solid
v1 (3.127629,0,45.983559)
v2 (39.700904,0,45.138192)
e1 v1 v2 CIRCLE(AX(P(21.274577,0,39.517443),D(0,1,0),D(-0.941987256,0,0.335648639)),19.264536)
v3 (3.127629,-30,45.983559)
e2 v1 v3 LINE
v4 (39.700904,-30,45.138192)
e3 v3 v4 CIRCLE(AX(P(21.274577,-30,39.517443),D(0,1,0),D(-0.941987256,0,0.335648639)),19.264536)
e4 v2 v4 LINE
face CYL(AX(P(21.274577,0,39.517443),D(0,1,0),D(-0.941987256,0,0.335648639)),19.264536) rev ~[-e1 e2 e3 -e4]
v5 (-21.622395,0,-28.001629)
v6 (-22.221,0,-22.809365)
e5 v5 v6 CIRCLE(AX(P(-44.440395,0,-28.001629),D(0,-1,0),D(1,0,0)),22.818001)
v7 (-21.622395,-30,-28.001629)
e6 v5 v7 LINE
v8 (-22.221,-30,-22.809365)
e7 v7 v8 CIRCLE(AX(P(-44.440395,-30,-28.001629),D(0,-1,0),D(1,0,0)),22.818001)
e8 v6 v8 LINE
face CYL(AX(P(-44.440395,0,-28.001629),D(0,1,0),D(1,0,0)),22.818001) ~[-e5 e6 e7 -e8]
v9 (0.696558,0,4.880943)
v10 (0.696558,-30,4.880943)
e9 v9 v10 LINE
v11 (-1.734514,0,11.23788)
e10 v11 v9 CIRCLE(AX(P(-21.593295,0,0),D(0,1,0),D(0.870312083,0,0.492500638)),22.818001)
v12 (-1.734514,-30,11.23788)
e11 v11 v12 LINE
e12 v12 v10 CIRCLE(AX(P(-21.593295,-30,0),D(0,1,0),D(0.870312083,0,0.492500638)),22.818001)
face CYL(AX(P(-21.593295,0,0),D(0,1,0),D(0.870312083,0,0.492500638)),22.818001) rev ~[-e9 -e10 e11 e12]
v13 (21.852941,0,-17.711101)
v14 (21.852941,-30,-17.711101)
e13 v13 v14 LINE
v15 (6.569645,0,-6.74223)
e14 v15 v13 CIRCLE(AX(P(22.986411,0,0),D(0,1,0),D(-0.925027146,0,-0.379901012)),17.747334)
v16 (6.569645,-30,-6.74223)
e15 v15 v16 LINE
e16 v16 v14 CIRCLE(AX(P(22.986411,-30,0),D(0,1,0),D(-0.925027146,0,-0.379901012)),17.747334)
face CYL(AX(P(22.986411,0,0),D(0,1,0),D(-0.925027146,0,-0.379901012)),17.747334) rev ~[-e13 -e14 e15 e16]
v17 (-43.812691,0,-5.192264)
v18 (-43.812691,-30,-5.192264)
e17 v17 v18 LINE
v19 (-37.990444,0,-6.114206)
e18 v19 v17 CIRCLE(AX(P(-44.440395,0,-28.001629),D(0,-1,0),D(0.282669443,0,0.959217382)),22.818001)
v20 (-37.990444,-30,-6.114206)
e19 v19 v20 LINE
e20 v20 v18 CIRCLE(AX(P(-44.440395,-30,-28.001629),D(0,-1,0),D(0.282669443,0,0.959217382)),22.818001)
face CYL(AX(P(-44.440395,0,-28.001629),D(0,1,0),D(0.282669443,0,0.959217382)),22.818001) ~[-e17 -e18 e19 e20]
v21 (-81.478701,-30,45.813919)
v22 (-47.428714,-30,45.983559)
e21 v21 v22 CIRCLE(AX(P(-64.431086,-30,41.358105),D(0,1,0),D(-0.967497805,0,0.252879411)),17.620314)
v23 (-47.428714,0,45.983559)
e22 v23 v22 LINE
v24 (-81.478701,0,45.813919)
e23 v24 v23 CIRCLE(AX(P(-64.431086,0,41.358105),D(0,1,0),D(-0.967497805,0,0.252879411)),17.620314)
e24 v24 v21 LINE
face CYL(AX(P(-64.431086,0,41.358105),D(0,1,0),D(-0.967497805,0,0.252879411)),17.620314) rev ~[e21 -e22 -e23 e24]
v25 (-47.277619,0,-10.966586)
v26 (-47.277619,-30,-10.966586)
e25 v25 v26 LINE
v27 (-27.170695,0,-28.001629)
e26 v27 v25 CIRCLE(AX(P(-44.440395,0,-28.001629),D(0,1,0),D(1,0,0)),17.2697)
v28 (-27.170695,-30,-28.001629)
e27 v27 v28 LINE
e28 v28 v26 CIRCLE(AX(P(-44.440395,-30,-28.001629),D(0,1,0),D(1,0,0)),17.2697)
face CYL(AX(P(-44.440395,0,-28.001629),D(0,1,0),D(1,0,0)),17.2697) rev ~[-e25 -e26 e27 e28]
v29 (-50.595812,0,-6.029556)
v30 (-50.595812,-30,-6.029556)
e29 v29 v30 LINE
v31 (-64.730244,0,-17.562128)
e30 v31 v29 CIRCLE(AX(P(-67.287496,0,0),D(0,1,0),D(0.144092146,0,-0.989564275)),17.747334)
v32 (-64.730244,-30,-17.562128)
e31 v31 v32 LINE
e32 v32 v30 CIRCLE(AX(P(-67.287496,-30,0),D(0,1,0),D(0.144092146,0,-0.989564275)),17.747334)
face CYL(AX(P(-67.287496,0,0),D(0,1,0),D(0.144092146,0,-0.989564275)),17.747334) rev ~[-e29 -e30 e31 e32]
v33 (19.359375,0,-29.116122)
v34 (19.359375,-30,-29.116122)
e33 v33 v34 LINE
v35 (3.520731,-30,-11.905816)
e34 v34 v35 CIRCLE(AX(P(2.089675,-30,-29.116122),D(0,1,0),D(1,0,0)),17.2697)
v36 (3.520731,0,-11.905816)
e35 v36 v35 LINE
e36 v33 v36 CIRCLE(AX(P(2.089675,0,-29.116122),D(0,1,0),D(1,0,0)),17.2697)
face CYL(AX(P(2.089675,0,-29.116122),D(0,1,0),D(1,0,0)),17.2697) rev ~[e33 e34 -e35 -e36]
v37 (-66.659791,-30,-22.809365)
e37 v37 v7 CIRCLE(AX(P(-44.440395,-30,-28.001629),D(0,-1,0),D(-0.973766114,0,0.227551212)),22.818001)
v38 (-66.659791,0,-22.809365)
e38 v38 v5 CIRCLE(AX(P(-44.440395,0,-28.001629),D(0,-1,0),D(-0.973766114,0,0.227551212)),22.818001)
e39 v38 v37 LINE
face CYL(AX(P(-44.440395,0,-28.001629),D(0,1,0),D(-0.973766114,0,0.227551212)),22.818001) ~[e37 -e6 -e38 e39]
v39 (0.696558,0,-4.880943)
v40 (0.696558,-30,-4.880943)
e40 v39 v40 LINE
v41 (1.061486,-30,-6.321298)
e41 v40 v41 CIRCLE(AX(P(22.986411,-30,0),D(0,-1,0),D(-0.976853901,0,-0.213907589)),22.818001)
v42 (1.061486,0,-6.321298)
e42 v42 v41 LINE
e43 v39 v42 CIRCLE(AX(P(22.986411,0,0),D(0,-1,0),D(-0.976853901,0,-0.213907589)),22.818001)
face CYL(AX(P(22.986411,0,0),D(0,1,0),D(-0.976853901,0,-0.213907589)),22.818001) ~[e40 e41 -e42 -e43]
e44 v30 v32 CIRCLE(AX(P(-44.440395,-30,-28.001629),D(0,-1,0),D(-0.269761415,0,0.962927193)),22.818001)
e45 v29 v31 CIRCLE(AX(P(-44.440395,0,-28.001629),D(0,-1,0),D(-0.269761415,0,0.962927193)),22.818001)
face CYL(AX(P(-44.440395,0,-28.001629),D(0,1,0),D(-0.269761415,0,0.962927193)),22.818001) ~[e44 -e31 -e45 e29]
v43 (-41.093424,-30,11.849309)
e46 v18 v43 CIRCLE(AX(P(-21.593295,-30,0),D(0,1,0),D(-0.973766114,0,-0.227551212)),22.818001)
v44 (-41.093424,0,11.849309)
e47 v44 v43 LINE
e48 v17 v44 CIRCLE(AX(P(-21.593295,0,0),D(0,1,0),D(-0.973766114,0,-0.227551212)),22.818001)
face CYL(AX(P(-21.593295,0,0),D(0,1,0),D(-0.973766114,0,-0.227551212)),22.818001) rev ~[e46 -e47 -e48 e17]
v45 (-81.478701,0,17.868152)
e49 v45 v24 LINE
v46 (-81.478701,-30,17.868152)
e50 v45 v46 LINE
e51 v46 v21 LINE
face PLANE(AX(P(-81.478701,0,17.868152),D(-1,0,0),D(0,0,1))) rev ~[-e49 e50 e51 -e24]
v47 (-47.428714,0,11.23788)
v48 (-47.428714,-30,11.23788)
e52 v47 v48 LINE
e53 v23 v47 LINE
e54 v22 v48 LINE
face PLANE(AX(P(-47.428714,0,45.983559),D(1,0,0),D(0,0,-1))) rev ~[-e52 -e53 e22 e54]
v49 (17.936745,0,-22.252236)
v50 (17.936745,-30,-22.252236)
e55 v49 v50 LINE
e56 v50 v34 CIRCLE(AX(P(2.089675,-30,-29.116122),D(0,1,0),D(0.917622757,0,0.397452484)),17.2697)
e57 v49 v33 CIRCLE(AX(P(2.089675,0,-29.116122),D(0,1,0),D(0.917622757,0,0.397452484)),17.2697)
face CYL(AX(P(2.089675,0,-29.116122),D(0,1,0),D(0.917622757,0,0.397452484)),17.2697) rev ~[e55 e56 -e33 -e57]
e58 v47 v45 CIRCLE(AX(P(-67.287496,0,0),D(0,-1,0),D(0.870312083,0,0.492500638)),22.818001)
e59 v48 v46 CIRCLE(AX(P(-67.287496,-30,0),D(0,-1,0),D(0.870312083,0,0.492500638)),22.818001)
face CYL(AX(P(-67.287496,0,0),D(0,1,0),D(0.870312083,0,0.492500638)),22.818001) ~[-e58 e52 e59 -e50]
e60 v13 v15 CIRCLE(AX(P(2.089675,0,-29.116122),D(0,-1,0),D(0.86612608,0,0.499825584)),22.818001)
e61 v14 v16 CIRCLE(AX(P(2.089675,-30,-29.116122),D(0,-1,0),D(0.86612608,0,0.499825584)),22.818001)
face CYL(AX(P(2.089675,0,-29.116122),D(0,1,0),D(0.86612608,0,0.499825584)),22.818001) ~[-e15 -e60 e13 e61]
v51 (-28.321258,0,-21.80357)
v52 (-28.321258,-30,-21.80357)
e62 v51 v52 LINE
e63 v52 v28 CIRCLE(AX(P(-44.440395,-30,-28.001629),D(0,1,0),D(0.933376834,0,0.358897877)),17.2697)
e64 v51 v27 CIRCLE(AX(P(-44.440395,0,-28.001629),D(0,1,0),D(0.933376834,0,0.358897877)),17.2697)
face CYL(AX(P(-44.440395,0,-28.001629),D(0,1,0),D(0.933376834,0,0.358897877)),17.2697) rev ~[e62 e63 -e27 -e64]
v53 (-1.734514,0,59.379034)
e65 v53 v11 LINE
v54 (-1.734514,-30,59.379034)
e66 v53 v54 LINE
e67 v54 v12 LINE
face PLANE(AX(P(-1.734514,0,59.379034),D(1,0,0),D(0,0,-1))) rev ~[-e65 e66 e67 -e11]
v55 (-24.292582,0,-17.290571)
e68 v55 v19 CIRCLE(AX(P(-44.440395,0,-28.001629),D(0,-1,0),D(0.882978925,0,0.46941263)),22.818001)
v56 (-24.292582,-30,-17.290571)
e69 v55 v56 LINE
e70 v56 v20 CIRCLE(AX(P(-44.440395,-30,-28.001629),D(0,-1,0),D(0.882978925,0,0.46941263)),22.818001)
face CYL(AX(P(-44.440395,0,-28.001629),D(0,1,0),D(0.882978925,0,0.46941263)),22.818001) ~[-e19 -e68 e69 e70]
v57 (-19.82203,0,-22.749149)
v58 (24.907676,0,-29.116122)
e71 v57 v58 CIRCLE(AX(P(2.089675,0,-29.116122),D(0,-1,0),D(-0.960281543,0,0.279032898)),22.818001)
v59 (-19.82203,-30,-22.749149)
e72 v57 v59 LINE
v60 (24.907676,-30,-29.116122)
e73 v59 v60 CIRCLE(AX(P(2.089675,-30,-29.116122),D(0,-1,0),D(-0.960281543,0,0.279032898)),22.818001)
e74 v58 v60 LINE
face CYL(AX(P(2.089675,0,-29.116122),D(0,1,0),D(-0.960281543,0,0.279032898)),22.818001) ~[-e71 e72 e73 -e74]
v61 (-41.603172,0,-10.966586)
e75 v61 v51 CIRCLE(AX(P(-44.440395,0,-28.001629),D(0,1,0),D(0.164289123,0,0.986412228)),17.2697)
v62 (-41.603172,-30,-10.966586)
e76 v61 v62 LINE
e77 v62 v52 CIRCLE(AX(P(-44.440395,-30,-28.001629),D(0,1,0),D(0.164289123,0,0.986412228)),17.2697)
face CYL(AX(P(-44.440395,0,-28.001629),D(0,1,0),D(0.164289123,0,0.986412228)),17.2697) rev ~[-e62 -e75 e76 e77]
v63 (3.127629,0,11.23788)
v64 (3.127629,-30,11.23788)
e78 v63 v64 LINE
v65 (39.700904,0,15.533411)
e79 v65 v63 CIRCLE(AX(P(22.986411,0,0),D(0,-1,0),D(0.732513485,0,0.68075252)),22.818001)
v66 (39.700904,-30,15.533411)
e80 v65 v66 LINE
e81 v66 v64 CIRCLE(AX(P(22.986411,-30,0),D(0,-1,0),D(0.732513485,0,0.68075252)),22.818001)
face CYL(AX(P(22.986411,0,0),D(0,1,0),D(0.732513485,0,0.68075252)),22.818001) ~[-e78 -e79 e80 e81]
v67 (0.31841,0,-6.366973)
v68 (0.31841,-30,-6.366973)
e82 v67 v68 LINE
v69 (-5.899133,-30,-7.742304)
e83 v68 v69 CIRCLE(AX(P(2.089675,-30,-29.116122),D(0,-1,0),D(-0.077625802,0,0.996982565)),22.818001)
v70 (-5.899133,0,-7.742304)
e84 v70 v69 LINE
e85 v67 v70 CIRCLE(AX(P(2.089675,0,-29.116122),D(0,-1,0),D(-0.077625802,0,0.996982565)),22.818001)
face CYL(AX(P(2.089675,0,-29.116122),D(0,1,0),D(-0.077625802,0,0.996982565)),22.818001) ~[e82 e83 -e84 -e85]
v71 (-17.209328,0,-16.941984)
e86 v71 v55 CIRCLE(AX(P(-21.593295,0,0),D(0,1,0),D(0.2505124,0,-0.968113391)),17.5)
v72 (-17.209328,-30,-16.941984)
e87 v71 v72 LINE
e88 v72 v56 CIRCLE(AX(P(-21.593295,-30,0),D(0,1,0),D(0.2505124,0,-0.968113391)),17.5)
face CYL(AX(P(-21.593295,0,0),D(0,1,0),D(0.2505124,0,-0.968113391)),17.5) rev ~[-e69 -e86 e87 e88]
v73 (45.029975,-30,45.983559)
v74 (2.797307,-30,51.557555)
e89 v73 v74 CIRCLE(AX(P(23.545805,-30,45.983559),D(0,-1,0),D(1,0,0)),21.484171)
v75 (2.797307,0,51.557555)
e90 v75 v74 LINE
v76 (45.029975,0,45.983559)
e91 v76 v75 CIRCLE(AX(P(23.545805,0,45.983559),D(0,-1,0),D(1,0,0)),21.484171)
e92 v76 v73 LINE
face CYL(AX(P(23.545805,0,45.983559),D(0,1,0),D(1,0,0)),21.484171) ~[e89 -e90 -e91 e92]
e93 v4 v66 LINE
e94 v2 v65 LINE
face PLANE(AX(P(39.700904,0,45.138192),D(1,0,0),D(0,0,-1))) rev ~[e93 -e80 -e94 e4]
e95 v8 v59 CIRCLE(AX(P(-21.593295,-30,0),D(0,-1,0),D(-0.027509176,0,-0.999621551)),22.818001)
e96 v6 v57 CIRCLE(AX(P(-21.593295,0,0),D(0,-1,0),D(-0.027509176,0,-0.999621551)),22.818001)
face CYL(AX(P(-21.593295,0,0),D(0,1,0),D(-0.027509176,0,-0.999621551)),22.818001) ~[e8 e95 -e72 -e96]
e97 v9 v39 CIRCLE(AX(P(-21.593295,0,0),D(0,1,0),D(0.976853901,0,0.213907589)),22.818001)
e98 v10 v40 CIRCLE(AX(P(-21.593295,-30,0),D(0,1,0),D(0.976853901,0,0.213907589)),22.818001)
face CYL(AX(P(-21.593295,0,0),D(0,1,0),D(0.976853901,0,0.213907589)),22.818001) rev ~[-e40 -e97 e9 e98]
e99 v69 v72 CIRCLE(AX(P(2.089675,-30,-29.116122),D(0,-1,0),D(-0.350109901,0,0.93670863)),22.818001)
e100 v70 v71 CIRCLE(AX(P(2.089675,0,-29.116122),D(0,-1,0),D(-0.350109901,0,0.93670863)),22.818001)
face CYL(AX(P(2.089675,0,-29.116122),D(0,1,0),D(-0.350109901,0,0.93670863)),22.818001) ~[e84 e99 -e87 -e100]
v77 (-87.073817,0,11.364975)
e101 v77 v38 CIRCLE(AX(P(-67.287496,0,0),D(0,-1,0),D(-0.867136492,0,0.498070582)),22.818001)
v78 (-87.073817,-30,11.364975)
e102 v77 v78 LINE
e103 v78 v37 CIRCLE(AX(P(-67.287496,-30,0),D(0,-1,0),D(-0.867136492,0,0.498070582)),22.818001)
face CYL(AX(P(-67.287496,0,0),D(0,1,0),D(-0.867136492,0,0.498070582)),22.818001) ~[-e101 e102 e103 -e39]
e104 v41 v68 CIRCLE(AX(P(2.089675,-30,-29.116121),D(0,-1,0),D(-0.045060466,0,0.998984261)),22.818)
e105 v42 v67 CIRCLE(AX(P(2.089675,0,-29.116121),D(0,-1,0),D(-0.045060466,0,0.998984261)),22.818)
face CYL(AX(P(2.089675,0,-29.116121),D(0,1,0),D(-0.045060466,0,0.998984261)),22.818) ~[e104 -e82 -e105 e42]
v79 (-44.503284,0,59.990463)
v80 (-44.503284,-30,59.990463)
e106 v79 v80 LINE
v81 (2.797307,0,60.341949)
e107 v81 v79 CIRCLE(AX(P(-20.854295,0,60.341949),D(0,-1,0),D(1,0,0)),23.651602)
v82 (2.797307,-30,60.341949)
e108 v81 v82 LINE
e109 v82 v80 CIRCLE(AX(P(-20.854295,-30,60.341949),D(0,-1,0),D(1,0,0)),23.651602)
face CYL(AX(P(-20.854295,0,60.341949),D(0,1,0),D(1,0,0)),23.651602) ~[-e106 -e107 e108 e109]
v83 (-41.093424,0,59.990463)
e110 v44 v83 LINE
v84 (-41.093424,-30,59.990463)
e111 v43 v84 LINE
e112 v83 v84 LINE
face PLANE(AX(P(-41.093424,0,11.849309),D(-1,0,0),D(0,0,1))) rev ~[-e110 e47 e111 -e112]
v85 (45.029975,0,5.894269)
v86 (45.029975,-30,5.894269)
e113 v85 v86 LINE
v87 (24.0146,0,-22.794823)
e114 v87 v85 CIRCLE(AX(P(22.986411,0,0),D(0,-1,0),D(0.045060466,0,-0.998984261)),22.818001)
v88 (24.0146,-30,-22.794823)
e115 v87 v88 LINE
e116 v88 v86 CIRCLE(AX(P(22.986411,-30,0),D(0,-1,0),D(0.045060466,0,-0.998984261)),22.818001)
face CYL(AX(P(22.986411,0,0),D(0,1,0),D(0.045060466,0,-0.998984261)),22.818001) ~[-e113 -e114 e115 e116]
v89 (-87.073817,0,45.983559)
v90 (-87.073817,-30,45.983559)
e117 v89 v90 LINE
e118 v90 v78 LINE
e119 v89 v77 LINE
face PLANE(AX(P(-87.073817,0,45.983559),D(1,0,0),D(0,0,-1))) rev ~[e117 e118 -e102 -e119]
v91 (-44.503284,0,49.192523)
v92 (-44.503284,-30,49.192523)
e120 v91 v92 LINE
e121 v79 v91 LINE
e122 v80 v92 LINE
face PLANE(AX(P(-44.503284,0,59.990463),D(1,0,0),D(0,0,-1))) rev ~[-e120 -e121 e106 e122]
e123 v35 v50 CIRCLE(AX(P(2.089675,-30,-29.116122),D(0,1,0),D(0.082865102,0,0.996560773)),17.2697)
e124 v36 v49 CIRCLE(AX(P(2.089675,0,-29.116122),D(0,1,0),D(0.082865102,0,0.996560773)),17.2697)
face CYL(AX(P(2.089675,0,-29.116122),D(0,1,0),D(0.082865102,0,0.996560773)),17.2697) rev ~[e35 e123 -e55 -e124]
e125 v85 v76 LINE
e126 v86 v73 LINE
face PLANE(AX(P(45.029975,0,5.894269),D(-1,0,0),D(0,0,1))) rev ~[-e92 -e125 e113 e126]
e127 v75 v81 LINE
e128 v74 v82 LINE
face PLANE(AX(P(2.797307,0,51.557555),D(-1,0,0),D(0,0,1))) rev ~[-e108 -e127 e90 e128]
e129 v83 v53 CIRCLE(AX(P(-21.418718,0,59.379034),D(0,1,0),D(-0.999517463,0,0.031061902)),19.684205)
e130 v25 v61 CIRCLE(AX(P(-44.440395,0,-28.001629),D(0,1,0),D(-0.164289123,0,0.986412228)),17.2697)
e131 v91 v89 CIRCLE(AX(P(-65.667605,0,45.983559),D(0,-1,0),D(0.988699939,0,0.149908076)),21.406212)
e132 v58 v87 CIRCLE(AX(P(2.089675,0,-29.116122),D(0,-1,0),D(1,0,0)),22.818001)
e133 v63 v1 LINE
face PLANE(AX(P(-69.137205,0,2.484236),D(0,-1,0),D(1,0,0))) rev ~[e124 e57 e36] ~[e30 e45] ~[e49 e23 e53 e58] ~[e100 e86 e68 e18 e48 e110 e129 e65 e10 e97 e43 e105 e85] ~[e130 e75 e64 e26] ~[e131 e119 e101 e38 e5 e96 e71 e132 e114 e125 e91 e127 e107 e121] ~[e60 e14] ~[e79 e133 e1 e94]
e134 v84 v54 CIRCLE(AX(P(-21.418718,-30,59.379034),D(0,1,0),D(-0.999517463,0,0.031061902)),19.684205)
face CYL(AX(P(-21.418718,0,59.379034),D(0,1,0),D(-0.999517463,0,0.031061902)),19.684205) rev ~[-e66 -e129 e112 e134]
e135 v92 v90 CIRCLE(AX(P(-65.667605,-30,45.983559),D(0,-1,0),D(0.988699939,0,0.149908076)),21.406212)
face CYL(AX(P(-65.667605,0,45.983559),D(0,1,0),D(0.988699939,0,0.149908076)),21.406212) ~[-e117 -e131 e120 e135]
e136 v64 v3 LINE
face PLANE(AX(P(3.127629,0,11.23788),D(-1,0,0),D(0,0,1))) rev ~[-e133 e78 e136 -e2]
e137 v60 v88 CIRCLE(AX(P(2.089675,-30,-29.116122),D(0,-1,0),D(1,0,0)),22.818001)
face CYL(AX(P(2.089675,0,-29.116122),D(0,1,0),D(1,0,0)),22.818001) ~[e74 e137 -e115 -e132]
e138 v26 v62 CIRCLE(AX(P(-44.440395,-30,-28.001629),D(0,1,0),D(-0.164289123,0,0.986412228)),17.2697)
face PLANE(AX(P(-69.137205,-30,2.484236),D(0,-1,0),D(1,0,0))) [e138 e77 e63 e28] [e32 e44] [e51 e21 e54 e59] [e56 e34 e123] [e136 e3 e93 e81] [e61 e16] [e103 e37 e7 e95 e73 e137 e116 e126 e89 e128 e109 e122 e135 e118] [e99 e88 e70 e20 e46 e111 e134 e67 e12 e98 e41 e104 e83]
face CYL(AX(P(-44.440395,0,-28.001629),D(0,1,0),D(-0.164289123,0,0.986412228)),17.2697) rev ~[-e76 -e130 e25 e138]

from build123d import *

# Parameters (mm, degrees)
F1_DEPTH = 30


# Not quite as in the source:
# - a feature of the source that left no trace in its solid (it failed there, or was rolled back) is left out
# - a feature names something its author has since deleted; it is built from what else it names


with BuildPart() as f1:
    # F0 (on Front) → F1 (new body)
    with BuildSketch(Plane.XZ):
        with BuildLine():
            ThreePointArc((-50.5958115044, -6.02955559), (-47.8576962726, -5.4409727065), (-45.0680997666, -5.1922637066))
            ThreePointArc((-45.0680997666, -5.1922637066), (-44.7014233398, 3.2450721847), (-47.4287139254, 11.2378798646))
            ThreePointArc((-47.4287139254, 11.2378798646), (-62.9262479802, 22.3973362627), (-81.478701042, 17.868151538))
            ThreePointArc((-81.478701042, 17.868151538), (-84.5846312596, 14.8818765302), (-87.0738165711, 11.3649748506))
            ThreePointArc((-87.0738165711, 11.3649748506), (-86.8766386462, -11.7015650942), (-66.6597911749, -22.8093651683))
            ThreePointArc((-66.6597911749, -22.8093651683), (-65.8563320665, -20.1264267988), (-64.7302441516, -17.5621275103))
            ThreePointArc((-64.7302441516, -17.5621275103), (-78.5071405294, 13.7509063134), (-50.5958115044, -6.02955559))
        make_face()
        with BuildLine():
            ThreePointArc((-47.4287139254, 11.2378798646), (-44.7014233398, 3.2450721847), (-45.0680997666, -5.1922637066))
            ThreePointArc((-45.0680997666, -5.1922637066), (-44.4403953733, -5.1836282573), (-43.8126909801, -5.1922637066))
            ThreePointArc((-43.8126909801, -5.1922637066), (-44.1262374484, 3.5955062023), (-41.0934242922, 11.8493087029))
            Line((-41.0934242922, 11.8493087029), (-41.0934242922, 59.9904626227))
            ThreePointArc((-41.0934242922, 59.9904626227), (-21.1129667901, 79.0608636102), (-1.7345135358, 59.3790337844))
            Line((-1.7345135358, 59.3790337844), (-1.7345135358, 11.2378798646))
            ThreePointArc((-1.7345135358, 11.2378798646), (-0.2806344187, 8.1505609331), (0.6965577317, 4.8809434977))
            ThreePointArc((0.6965577317, 4.8809434977), (1.6737498821, 8.1505609331), (3.1276289991, 11.2378798646))
            Line((3.1276289991, 11.2378798646), (3.1276289991, 45.9835585246))
            ThreePointArc((3.1276289991, 45.9835585246), (21.7197442499, 58.7768351813), (39.7009037986, 45.1381923457))
            Line((39.7009037986, 45.1381923457), (39.7009037986, 15.5334114315))
            ThreePointArc((39.7009037986, 15.5334114315), (42.9557629485, 11.0402047373), (45.0299754174, 5.8942687567))
            Line((45.0299754174, 5.8942687567), (45.0299754174, 45.9835585246))
            ThreePointArc((45.0299754174, 45.9835585246), (26.3569721709, 67.2830168196), (2.7973072292, 51.5575546089))
            Line((2.7973072292, 51.5575546089), (2.7973072292, 60.3419492483))
            ThreePointArc((2.7973072292, 60.3419492483), (-21.0300426798, 83.9928980167), (-44.5032843921, 59.9904626227))
            Line((-44.5032843921, 59.9904626227), (-44.5032843921, 49.1925225526))
            ThreePointArc((-44.5032843921, 49.1925225526), (-67.2766387272, 67.32921183), (-87.0738165711, 45.9835585246))
            Line((-87.0738165711, 45.9835585246), (-87.0738165711, 11.3649748506))
            ThreePointArc((-87.0738165711, 11.3649748506), (-84.5846312596, 14.8818765302), (-81.478701042, 17.868151538))
            Line((-81.478701042, 17.868151538), (-81.478701042, 45.8139192271))
            ThreePointArc((-81.478701042, 45.8139192271), (-64.5188702281, 58.9782000656), (-47.4287139254, 45.9835585246))
            Line((-47.4287139254, 45.9835585246), (-47.4287139254, 11.2378798646))
        make_face()
        with BuildLine():
            ThreePointArc((-43.8126909801, -5.1922637066), (-44.4403953733, -5.1836282573), (-45.0680997666, -5.1922637066))
            ThreePointArc((-45.0680997666, -5.1922637066), (-47.8576962726, -5.4409727065), (-50.5958115044, -6.02955559))
            ThreePointArc((-50.5958115044, -6.02955559), (-58.8656531806, -10.3218921863), (-64.7302441516, -17.5621275103))
            ThreePointArc((-64.7302441516, -17.5621275103), (-65.8563320665, -20.1264267988), (-66.6597911749, -22.8093651683))
            ThreePointArc((-66.6597911749, -22.8093651683), (-47.0537232386, -50.6694843019), (-21.6223947557, -28.001628875))
            ThreePointArc((-21.6223947557, -28.001628875), (-21.7725399464, -25.3883010097), (-22.2209995718, -22.8093651683))
            ThreePointArc((-22.2209995718, -22.8093651683), (-23.0778257417, -19.9827903731), (-24.2925817064, -17.2905711947))
            ThreePointArc((-24.2925817064, -17.2905711947), (-30.0151375661, -10.3218921863), (-37.9904438403, -6.1142060617))
            ThreePointArc((-37.9904438403, -6.1142060617), (-40.8716704219, -5.4644295279), (-43.8126909801, -5.1922637066))
        make_face()
        with BuildLine():
            ThreePointArc((-28.3212575169, -21.8035702343), (-27.4607721402, -24.8496563168), (-27.1706954296, -28.001628875))
            ThreePointArc((-27.1706954296, -28.001628875), (-47.5923679315, -44.9812521081), (-60.5595332298, -21.8035702343))
            ThreePointArc((-60.5595332298, -21.8035702343), (-55.3580861087, -14.6208006063), (-47.2776192349, -10.9665856726))
            ThreePointArc((-47.2776192349, -10.9665856726), (-44.4403953733, -10.7319289312), (-41.6031715118, -10.9665856726))
            ThreePointArc((-41.6031715118, -10.9665856726), (-33.522704638, -14.6208006063), (-28.3212575169, -21.8035702343))
        make_face(mode=Mode.SUBTRACT)
        with BuildLine():
            ThreePointArc((-17.209328187, -16.9419843412), (-20.7331119046, -17.4788467793), (-24.2925817064, -17.2905711947))
            ThreePointArc((-24.2925817064, -17.2905711947), (-23.0778257417, -19.9827903731), (-22.2209995718, -22.8093651683))
            ThreePointArc((-22.2209995718, -22.8093651683), (-21.0207224268, -22.8108156941), (-19.8220295884, -22.749148784))
            ThreePointArc((-19.8220295884, -22.749148784), (-18.7192509321, -19.7539774624), (-17.209328187, -16.9419843412))
        make_face()
        with BuildLine():
            ThreePointArc((0.318409666, -6.3669728281), (-2.8385741788, -6.8366801987), (-5.8991326911, -7.7423035215))
            ThreePointArc((-5.8991326911, -7.7423035215), (-12.3087515473, -11.4145268316), (-17.209328187, -16.9419843412))
            ThreePointArc((-17.209328187, -16.9419843412), (-18.7192509321, -19.7539774624), (-19.8220295884, -22.749148784))
            ThreePointArc((-19.8220295884, -22.749148784), (-1.125900704, -51.7064120801), (24.9076758738, -29.1161216121))
            ThreePointArc((24.9076758738, -29.1161216121), (24.6833038658, -25.92408489), (24.0146003931, -22.7948234918))
            ThreePointArc((24.0146003931, -22.7948234918), (23.0881839229, -20.1873038876), (21.8529406759, -17.7111011327))
            ThreePointArc((21.8529406759, -17.7111011327), (15.3942852462, -10.5783627076), (6.5696450929, -6.7422300764))
            ThreePointArc((6.5696450929, -6.7422300764), (3.8283507197, -6.3644588197), (1.0614855049, -6.3212981203))
            ThreePointArc((1.0614855049, -6.3212981203), (0.6897612956, -6.3411047495), (0.318409666, -6.3669728281))
        make_face()
        with BuildLine():
            ThreePointArc((19.3593751999, -29.1161216121), (-10.6177327064, -40.8107493967), (3.5207306993, -11.9058160812))
            ThreePointArc((3.5207306993, -11.9058160812), (12.1592087901, -15.0859031335), (17.936744923, -22.2522364789))
            ThreePointArc((17.936744923, -22.2522364789), (18.9999779483, -25.6112394448), (19.3593751999, -29.1161216121))
        make_face(mode=Mode.SUBTRACT)
        with BuildLine():
            ThreePointArc((3.1276289991, 11.2378798646), (1.6737498821, 8.1505609331), (0.6965577317, 4.8809434977))
            ThreePointArc((0.6965577317, 4.8809434977), (1.2247054391, 0), (0.6965577317, -4.8809434977))
            ThreePointArc((0.6965577317, -4.8809434977), (0.8672943666, -5.6040920216), (1.0614855049, -6.3212981203))
            ThreePointArc((1.0614855049, -6.3212981203), (3.8283507197, -6.3644588197), (6.5696450929, -6.7422300764))
            ThreePointArc((6.5696450929, -6.7422300764), (33.3344406342, 14.4182569257), (21.8529406759, -17.7111011327))
            ThreePointArc((21.8529406759, -17.7111011327), (23.0881839229, -20.1873038876), (24.0146003931, -22.7948234918))
            ThreePointArc((24.0146003931, -22.7948234918), (41.3940847955, -13.484015887), (45.0299754174, 5.8942687567))
            ThreePointArc((45.0299754174, 5.8942687567), (42.9557629485, 11.0402047373), (39.7009037986, 15.5334114315))
            ThreePointArc((39.7009037986, 15.5334114315), (20.3247315889, 22.6622288579), (3.1276289991, 11.2378798646))
        make_face()
    extrude(amount=F1_DEPTH)


solid = f1.part
